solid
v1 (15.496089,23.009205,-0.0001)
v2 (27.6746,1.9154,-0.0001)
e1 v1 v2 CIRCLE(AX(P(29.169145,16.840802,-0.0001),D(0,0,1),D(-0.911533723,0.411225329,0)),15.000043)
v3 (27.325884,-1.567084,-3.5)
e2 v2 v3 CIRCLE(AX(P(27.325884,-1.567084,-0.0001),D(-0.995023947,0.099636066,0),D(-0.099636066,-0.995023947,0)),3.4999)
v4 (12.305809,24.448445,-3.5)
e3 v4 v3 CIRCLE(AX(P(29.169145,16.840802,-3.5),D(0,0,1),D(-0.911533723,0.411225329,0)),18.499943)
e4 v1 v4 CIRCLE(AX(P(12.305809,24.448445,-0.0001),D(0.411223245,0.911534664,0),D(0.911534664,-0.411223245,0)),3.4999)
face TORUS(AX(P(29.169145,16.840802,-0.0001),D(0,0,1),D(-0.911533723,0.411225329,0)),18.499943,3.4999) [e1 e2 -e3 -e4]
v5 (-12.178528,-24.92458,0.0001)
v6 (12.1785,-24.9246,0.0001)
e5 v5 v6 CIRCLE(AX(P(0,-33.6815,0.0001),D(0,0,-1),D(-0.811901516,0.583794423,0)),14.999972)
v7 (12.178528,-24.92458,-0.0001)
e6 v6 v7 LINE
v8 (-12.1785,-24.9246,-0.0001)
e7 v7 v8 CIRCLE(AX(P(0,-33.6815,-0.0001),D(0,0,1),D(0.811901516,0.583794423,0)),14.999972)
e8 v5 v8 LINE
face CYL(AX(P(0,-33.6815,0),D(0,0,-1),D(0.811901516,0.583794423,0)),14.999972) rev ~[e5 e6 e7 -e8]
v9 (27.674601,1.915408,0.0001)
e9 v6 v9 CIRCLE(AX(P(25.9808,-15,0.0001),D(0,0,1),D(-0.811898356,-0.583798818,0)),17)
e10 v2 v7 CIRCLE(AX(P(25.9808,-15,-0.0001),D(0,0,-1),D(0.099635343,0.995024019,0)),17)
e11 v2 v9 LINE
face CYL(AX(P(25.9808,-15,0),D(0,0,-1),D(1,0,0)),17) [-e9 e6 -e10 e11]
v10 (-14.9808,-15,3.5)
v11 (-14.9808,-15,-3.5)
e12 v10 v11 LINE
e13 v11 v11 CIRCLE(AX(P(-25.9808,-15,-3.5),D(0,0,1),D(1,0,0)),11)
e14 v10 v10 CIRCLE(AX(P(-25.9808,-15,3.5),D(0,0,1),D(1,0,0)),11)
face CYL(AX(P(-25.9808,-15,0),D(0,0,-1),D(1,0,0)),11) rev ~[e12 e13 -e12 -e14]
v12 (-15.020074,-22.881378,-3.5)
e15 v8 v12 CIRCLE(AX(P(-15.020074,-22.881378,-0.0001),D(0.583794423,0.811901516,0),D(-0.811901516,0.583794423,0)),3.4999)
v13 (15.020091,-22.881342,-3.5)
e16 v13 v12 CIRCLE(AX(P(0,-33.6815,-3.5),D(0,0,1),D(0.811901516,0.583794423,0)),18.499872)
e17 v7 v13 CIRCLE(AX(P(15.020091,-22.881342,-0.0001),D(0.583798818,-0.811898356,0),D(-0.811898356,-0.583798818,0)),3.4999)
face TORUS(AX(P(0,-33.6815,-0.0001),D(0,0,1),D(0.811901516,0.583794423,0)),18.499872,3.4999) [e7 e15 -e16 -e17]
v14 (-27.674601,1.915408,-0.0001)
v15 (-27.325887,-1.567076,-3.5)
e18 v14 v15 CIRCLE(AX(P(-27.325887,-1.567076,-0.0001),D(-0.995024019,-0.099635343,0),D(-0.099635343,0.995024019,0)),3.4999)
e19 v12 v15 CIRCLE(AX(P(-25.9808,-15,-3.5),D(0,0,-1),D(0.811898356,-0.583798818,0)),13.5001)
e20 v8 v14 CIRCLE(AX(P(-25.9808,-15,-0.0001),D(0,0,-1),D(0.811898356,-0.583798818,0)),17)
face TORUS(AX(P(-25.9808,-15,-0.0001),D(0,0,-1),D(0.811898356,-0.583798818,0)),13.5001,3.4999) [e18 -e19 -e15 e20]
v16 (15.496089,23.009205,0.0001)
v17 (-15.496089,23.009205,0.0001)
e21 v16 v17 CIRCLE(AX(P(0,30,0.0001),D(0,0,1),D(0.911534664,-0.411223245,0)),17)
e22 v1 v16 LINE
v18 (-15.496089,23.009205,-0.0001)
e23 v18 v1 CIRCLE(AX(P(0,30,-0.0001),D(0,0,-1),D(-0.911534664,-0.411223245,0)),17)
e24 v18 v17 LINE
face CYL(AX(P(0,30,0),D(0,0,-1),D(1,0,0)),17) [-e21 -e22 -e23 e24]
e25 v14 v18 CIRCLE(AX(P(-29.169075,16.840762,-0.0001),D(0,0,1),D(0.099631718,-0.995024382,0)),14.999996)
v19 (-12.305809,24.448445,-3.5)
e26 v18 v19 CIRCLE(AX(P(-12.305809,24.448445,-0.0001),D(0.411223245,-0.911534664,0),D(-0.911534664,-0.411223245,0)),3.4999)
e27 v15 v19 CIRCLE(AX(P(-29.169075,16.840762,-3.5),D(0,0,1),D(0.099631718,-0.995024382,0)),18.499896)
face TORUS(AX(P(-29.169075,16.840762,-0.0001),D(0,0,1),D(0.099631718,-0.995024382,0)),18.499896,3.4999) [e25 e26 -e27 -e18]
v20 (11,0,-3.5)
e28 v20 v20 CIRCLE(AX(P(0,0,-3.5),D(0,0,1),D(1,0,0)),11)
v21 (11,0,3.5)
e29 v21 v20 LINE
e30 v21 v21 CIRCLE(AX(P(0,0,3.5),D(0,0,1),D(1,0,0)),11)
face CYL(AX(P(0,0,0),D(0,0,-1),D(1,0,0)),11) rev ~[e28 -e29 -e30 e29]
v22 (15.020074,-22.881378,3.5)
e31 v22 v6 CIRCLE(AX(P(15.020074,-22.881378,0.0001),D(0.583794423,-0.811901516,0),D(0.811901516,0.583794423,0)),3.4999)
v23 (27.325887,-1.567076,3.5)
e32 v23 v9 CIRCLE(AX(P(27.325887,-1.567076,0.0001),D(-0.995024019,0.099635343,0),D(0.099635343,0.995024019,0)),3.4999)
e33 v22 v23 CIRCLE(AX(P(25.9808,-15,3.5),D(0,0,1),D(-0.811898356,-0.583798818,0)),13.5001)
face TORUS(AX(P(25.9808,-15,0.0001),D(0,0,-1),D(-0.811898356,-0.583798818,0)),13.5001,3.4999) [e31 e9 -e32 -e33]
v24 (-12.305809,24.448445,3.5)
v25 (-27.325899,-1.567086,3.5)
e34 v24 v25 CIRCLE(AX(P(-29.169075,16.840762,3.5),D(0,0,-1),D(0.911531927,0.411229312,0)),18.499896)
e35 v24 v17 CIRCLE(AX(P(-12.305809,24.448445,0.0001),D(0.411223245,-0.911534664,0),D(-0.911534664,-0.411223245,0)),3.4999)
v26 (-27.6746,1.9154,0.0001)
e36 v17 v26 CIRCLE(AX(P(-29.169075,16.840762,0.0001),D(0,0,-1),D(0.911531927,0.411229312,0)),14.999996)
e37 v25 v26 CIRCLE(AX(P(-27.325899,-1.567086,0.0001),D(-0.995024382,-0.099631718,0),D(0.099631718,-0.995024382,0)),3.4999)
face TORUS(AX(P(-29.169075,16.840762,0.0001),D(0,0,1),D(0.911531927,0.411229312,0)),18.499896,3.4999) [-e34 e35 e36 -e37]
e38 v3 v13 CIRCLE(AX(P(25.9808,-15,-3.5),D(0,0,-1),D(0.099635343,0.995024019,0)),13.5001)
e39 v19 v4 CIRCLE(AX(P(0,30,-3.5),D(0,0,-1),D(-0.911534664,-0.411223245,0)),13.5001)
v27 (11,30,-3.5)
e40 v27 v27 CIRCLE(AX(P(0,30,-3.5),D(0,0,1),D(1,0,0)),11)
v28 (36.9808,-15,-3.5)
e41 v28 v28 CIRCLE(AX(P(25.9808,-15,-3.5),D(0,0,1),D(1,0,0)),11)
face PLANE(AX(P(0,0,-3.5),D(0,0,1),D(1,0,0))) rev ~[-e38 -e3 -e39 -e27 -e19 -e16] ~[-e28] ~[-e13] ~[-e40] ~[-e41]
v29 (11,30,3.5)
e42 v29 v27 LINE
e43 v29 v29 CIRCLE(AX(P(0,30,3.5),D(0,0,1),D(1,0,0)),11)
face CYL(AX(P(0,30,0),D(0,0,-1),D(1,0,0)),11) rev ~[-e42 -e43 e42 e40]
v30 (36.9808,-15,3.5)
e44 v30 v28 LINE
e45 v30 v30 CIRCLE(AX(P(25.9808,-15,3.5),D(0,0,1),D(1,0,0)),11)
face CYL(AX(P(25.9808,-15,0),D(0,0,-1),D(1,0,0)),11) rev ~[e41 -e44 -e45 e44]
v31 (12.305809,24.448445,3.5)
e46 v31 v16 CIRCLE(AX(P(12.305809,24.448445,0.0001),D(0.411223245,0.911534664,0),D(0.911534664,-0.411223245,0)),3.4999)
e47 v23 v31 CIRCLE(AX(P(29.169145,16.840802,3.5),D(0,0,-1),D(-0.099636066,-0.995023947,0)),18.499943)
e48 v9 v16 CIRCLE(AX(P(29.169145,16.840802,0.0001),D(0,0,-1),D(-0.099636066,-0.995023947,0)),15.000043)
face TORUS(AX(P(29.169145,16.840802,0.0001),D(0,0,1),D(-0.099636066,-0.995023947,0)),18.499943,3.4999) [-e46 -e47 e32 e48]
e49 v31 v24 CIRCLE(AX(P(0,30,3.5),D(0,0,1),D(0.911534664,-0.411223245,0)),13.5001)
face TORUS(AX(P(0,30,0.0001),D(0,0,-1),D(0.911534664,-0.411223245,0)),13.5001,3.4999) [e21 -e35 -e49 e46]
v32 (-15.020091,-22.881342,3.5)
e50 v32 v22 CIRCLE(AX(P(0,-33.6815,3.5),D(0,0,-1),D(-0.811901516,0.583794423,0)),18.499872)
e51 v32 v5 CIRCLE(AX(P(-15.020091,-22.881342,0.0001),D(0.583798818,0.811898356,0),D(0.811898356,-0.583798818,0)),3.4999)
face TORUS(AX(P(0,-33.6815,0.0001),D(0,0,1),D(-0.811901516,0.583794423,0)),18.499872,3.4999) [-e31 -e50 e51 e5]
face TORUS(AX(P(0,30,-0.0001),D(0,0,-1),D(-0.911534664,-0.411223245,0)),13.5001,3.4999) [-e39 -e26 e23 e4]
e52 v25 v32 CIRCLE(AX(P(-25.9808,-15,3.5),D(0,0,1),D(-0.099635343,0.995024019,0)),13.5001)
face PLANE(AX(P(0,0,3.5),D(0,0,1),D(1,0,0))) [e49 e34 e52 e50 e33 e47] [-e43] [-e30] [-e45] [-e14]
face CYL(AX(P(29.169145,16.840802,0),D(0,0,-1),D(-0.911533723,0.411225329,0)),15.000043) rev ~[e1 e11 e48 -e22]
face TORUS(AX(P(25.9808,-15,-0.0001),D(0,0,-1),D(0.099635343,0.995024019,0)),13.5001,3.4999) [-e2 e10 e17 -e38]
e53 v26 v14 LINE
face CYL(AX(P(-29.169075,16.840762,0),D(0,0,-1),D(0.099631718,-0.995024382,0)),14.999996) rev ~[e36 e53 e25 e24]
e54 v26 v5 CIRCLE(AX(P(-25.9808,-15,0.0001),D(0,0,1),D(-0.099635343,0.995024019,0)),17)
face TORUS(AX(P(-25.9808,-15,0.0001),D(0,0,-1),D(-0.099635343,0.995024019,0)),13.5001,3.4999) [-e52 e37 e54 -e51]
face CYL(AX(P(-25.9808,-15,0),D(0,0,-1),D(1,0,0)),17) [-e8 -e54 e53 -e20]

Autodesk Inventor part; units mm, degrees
ref_plane "YZ Plane" through (0, 0, 0) normal (1, 0, 0) x (0, 1, 0)
ref_plane "XZ Plane" through (0, 0, 0) normal (0, 1, 0) x (-1, 0, 0)
ref_plane "XY Plane" through (0, 0, 0) normal (0, 0, 1) x (1, 0, 0)
sketch "Sketch1" plane through (0, 0, 0) normal (0, 0, 1) x (1, 0, 0)
  circle A0 centre (0, 0) radius 11
  circle A1 centre (0, 30) radius 11
  circle A2 centre (-25.9808, -15) radius 11
  circle A3 centre (25.9808, -15) radius 11
  circle A4 centre (25.9808, -15) radius 17
  circle A5 centre (-25.9808, -15) radius 17
  circle A6 centre (0, 30) radius 17
  arc A7 (-27.6746, 1.9154) -> (-15.4961, 23.0092) centre (-29.1691, 16.8408) ccw
  arc A8 (15.4961, 23.0092) -> (27.6746, 1.9154) centre (29.1691, 16.8408) ccw
  arc A9 (12.1785, -24.9246) -> (-12.1785, -24.9246) centre (0, -33.6815) ccw
  dimension "d0" = 22
  dimension "d1" = 22
  dimension "d2" = 30
  dimension "d5" = 360
  dimension "d8" = 6
  dimension "d9" = 6
  dimension "d10" = 6
  dimension "d11" = 15
  dimension "d12" = 15
  dimension "d13" = 15
extrude "Extrusion1" add sketch "Sketch1" along normal mid plane 7
full round fillet "Full Round Fillet1" first side at (17.2542, -0.5688, 3.5) centre faces at (10.4882, 43.379, 1.1667) second side at (17.2542, -0.5688, -3.5)
equation "\"d12\" = d11"
equation "\"d13\" = d11"
properties part number "Exam 3_03-30-2022 Leo Berman" material "Aluminum 6061"
